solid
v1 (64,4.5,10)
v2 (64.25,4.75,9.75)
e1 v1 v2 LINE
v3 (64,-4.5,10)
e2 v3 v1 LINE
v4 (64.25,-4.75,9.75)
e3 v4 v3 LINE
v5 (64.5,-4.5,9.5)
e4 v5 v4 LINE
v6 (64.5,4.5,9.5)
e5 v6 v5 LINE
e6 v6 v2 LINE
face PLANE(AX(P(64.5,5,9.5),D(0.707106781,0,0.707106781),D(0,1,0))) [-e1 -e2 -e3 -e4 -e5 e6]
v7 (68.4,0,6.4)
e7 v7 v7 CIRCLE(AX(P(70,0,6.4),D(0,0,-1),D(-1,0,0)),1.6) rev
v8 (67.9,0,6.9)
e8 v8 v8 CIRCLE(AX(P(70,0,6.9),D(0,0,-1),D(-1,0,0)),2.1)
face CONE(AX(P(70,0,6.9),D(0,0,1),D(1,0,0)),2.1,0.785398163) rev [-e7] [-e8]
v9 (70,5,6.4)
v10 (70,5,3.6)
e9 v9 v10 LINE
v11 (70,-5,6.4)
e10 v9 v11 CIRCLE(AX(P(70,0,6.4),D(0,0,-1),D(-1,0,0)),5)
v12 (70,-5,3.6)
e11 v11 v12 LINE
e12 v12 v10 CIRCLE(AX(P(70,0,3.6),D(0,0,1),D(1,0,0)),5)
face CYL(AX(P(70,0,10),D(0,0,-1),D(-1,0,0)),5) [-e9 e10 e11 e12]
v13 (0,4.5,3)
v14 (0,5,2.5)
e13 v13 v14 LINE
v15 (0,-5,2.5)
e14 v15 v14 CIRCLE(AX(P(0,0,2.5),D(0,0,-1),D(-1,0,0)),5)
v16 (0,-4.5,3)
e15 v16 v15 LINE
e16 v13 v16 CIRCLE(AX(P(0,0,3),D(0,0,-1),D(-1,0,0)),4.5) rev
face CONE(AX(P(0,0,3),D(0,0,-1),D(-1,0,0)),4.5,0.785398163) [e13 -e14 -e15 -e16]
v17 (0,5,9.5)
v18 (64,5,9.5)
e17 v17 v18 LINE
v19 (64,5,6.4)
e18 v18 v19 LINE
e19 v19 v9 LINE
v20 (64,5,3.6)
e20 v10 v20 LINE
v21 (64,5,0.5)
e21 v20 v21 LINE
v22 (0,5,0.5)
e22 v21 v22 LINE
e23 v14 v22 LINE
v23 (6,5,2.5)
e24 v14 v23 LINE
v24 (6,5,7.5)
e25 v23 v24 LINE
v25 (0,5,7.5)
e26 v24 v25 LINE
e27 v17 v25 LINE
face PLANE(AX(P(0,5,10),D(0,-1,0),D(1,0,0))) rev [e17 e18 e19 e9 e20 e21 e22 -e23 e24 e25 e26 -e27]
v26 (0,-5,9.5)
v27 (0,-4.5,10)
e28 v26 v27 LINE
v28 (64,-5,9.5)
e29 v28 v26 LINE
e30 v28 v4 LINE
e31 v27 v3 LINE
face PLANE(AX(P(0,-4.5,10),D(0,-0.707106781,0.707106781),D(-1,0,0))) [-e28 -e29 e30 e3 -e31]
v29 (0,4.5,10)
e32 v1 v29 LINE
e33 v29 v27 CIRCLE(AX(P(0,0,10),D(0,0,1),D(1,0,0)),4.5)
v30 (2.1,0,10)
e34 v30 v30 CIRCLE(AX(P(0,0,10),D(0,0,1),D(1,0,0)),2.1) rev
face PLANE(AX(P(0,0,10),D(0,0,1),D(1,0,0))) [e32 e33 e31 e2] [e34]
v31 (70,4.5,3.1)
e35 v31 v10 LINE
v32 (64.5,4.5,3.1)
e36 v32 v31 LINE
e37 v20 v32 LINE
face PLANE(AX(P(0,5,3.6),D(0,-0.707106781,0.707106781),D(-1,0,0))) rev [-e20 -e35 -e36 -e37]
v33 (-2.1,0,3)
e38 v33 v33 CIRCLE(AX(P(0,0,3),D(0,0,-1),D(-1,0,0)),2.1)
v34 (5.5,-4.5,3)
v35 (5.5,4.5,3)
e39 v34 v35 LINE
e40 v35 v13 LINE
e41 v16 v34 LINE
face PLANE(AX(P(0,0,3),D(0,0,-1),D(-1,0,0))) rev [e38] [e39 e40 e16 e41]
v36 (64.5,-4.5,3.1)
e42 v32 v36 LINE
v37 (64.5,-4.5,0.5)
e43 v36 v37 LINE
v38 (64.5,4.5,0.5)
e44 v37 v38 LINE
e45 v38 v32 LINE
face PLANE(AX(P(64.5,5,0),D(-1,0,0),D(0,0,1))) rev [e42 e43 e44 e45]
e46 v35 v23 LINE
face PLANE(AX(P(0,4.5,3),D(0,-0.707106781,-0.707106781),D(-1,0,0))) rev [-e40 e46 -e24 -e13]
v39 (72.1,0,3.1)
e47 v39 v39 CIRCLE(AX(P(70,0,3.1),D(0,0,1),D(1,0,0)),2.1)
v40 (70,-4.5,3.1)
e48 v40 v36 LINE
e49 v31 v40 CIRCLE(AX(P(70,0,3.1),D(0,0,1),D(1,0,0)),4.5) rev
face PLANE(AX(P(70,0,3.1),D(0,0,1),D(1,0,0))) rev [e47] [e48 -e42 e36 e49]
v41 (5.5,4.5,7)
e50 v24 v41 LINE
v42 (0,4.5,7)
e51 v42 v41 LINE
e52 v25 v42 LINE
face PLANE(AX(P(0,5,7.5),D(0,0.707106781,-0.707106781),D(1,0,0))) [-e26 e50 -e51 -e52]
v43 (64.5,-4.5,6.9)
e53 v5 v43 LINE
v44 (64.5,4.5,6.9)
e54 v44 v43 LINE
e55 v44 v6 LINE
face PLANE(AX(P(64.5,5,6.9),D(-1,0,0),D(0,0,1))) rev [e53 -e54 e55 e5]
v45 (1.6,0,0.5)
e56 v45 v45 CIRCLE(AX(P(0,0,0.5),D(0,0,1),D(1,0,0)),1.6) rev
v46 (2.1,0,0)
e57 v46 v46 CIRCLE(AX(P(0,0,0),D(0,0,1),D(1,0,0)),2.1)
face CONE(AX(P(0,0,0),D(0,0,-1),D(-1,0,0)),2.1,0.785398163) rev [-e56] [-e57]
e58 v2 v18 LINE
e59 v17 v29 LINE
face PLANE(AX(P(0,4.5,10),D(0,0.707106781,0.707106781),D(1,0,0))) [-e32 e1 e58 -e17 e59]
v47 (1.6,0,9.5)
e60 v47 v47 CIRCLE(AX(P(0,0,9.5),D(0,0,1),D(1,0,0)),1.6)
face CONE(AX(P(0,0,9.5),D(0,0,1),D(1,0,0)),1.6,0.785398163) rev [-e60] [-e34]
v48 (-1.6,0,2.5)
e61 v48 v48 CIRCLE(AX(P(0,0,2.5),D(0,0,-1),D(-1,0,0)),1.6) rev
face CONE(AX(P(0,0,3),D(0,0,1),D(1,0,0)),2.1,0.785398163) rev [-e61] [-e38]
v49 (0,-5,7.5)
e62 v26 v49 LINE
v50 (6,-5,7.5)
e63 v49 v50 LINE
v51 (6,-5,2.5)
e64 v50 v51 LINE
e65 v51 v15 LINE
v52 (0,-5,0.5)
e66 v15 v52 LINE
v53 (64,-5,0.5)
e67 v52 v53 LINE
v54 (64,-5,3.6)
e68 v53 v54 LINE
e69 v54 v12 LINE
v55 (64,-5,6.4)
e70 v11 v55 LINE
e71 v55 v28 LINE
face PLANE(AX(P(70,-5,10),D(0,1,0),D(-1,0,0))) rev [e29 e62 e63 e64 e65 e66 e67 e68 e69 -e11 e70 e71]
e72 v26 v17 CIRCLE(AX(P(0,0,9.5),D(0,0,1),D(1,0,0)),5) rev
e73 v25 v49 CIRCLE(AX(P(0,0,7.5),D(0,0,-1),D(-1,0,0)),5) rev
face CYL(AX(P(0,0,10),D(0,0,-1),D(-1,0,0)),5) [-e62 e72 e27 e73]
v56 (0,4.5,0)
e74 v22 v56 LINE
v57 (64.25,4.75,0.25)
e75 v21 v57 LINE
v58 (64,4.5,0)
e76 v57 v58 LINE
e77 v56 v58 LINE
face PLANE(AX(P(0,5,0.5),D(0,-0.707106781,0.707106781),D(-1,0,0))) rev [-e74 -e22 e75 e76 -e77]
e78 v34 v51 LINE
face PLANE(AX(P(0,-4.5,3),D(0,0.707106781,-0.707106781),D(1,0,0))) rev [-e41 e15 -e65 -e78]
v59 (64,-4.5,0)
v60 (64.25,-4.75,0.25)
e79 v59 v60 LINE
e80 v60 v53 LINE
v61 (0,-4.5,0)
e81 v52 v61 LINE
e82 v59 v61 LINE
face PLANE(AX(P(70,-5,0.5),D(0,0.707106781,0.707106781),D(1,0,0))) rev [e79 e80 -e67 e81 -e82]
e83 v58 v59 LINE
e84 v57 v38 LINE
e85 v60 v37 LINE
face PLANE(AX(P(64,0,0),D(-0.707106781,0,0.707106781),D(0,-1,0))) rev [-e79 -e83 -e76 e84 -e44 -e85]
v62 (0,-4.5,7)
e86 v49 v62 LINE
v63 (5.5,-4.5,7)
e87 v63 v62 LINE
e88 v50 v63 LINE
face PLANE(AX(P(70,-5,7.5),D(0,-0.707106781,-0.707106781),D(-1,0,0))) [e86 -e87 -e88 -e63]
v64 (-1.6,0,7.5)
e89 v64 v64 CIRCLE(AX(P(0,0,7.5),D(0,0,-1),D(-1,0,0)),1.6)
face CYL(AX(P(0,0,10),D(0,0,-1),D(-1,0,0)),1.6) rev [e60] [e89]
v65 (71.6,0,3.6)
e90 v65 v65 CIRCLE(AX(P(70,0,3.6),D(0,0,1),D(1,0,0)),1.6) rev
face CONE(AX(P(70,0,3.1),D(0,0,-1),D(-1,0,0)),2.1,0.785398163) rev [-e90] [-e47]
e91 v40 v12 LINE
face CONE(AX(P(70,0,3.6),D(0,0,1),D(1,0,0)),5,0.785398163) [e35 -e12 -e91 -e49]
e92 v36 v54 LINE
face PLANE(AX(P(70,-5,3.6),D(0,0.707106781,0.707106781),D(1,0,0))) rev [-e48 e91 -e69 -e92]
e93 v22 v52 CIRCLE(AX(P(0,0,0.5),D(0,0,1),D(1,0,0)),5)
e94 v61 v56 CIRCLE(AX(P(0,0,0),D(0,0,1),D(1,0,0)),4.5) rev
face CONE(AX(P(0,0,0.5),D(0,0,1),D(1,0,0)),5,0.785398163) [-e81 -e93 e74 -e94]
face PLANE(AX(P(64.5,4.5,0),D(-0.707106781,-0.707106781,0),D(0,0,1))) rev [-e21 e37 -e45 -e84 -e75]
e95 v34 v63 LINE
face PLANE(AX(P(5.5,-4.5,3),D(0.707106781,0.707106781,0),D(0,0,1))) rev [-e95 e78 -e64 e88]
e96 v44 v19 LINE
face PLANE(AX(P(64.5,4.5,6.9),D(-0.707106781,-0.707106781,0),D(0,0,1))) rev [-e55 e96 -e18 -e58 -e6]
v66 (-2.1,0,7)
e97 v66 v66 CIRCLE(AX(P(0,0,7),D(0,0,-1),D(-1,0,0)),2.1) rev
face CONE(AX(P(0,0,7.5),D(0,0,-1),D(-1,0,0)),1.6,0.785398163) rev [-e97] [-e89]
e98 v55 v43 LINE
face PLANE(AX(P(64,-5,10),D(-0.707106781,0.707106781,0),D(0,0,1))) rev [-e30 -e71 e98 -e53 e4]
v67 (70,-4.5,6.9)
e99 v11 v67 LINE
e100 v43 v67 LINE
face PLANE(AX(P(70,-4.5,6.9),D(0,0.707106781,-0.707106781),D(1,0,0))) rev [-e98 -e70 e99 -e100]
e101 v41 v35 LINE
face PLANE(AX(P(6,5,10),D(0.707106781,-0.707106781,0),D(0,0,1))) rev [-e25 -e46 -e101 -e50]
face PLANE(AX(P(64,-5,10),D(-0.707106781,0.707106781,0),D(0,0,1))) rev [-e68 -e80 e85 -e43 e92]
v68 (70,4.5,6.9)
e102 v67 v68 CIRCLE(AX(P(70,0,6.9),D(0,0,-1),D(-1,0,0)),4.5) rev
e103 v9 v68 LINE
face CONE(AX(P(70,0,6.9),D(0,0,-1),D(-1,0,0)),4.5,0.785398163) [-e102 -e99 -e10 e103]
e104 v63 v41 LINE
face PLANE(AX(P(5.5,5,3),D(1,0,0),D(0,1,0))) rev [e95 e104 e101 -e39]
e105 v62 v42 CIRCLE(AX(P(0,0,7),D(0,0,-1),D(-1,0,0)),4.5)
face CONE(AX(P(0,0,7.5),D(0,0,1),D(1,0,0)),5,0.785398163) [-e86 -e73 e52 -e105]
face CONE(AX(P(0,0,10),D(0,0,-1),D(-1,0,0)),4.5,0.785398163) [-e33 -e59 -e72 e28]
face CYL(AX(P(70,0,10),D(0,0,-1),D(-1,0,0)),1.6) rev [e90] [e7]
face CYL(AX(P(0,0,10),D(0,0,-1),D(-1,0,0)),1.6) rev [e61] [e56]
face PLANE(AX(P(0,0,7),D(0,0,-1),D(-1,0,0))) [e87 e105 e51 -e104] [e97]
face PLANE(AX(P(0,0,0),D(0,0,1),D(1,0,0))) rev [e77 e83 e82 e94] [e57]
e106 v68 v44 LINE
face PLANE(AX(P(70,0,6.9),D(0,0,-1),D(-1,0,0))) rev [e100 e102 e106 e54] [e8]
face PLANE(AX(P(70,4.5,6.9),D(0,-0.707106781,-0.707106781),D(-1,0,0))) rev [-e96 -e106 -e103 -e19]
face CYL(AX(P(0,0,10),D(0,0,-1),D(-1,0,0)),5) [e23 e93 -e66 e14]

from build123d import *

# Parameters (mm, degrees)
SKETCH1_R           = 1.6
BOSS_EXTRUDE1_DEPTH = 10
CUT_EXTRUDE1_START  = -7
CUT_EXTRUDE1_DEPTH  = 4
CHAMFER1_SIZE       = 0.5
CUT_EXTRUDE2_START  = -3.1
CUT_EXTRUDE2_DEPTH  = 3.1
CUT_EXTRUDE3_START  = -6.9
CUT_EXTRUDE3_DEPTH  = 3.1
CHAMFER2_SIZE       = 0.5


with BuildPart() as part:
    # Sketch1 → Boss-Extrude1 (new body)
    with BuildSketch(Plane.XY):
        with BuildLine():
            Line((0, 5), (70, 5))
            ThreePointArc((70, 5), (75, 0), (70, -5))
            Line((70, -5), (0, -5))
            ThreePointArc((0, -5), (-5, 0), (0, 5))
        make_face()
        Circle(SKETCH1_R, mode=Mode.SUBTRACT)
        with Locations((70, 0)):
            Circle(SKETCH1_R, mode=Mode.SUBTRACT)
    extrude(amount=BOSS_EXTRUDE1_DEPTH)

    # Sketch2 → Cut-Extrude1 (cut)
    with BuildSketch(Plane.XY.offset(10).offset(CUT_EXTRUDE1_START)):
        with BuildLine():
            Line((5.5, 5), (5.5, -5))
            Line((5.5, -5), (0, -5))
            ThreePointArc((0, -5), (-5, 0), (0, 5))
            Line((0, 5), (5.5, 5))
        make_face()
    extrude(amount=CUT_EXTRUDE1_DEPTH, mode=Mode.SUBTRACT)

    # Chamfer1
    chamfer1_edges = [part.edges().sort_by_distance(p)[0] for p in [
        (75, 0, 10),
        (-1.6, 0, 0),
        (-1.6, 0, 10),
        (35, 5, 10),
        (68.4, 0, 0),
        (68.4, 0, 10),
        (-1.6, 0, 3),
        (2.75, 5, 3),
        (5.5, 5, 5),
        (2.75, -5, 3),
        (5.5, -5, 5),
        (-5, 0, 3),
        (-1.6, 0, 7),
        (2.75, 5, 7),
        (-5, 0, 7),
        (2.75, -5, 7),
        (-5, 0, 10),
        (35, 5, 0),
        (75, 0, 0),
        (35, -5, 0),
        (-5, 0, 0),
        (35, -5, 10),
    ]]
    chamfer(chamfer1_edges, length=CHAMFER1_SIZE)

    # Sketch3 → Cut-Extrude2 (cut)
    with BuildSketch(Plane.XY.offset(10).offset(CUT_EXTRUDE2_START)):
        with BuildLine():
            Line((64.5, 5), (64.5, -5))
            Line((64.5, -5), (70, -5))
            ThreePointArc((70, -5), (75, 0), (70, 5))
            Line((70, 5), (64.5, 5))
        make_face()
    extrude(amount=CUT_EXTRUDE2_DEPTH, mode=Mode.SUBTRACT)

    # Sketch4 → Cut-Extrude3 (cut)
    with BuildSketch(Plane.XY.offset(6.9).offset(CUT_EXTRUDE3_START)):
        with BuildLine():
            Line((64.5, 5), (64.5, -5))
            Line((64.5, -5), (70, -5))
            ThreePointArc((70, -5), (75, 0), (70, 5))
            Line((70, 5), (64.5, 5))
        make_face()
    extrude(amount=CUT_EXTRUDE3_DEPTH, mode=Mode.SUBTRACT)

    # Chamfer2
    # the kernel refuses this chamfer: 0.5 mm, written as the material it takes off along each edge
    with BuildSketch(Plane(origin=(70, 0, 6.9), x_dir=(1, 0, 0), z_dir=(0, 1, 0))) as chamfer2_piece_1:
        Polygon((1.6 + CHAMFER2_SIZE, 0), (1.6, CHAMFER2_SIZE), (1.6, 0), align=None)
    revolve(axis=Axis((70, 0, 6.9), (0, 0, -1)), mode=Mode.SUBTRACT)
    with BuildSketch(Plane(origin=(70, 0, 3.1), x_dir=(1, 0, 0), z_dir=(0, 1, 0))) as chamfer2_piece_2:
        Polygon((1.6 + CHAMFER2_SIZE, 0), (1.6, -CHAMFER2_SIZE), (1.6, 0), align=None)
    revolve(axis=Axis((70, 0, 3.1), (0, 0, -1)), mode=Mode.SUBTRACT)
    with BuildSketch(Plane(origin=(64.5, -5, -0.785841494), x_dir=(0.0274958766105822, 0.999621916911297, 0), z_dir=(0, 0, 1)), Plane(origin=(64.5, 5, -0.785841494), x_dir=(-0.9996219169112968, 0.02749587661058574, 0), z_dir=(0, 0, 1)), Plane(origin=(64.5, -5, 6.9), x_dir=(0.0274958766105822, 0.999621916911297, 0), z_dir=(0, 0, 1)), Plane(origin=(64.5, 5, 6.9), x_dir=(-0.9996219169112973, 0.027495876610566763, 0), z_dir=(0, 0, 1))) as chamfer2_piece_3:
        Polygon((CHAMFER2_SIZE * 0.999621916911, CHAMFER2_SIZE * 0.0274958766106), (-CHAMFER2_SIZE * 0.0274958766106, CHAMFER2_SIZE * 0.999621916911), (0, 0), align=None)
    extrude(amount=3.885841494, mode=Mode.SUBTRACT)
    with BuildSketch(Plane(origin=(64.5, 5.785841494, 0), x_dir=(0.027495876610582174, 0, 0.9996219169112968), z_dir=(0, -1, 0))) as chamfer2_piece_4:
        Polygon((CHAMFER2_SIZE * 0.999621916911, CHAMFER2_SIZE * 0.0274958766106), (-CHAMFER2_SIZE * 0.0274958766106, CHAMFER2_SIZE * 0.999621916911), (0, 0), align=None)
    extrude(amount=11.571682988, mode=Mode.SUBTRACT)
    with BuildSketch(Plane(origin=(64.5, -5, 3.1), x_dir=(0, 0.9996219169112968, -0.027495876610586462), z_dir=(1, 0, 0)), Plane(origin=(70, 5, 6.9), x_dir=(0, 0.027495876610585647, -0.9996219169112968), z_dir=(-1, 0, 0))) as chamfer2_piece_5:
        Polygon((CHAMFER2_SIZE * 0.999621916911, CHAMFER2_SIZE * 0.0274958766106), (-CHAMFER2_SIZE * 0.0274958766106, CHAMFER2_SIZE * 0.999621916911), (0, 0), align=None)
    extrude(amount=5.5, mode=Mode.SUBTRACT)
    with BuildSketch(Plane(origin=(70, 0, 3.1), x_dir=(0, -1, 0), z_dir=(-1, 0, 0))) as chamfer2_piece_6:
        Polygon((5, CHAMFER2_SIZE), (5 - CHAMFER2_SIZE, 0), (5, 0), align=None)
    revolve(axis=Axis((70, 0, 3.1), (0, 0, 1)), revolution_arc=180, mode=Mode.SUBTRACT)
    with BuildSketch(Plane(origin=(70, 5, 3.1), x_dir=(0, 0.027495876610585623, 0.9996219169112968), z_dir=(-1, 0, 0)), Plane(origin=(64.5, -5, 6.9), x_dir=(0, 0.9996219169112968, 0.0274958766105856), z_dir=(1, 0, 0))) as chamfer2_piece_7:
        Polygon((CHAMFER2_SIZE * 0.999621916911, -CHAMFER2_SIZE * 0.0274958766106), (-CHAMFER2_SIZE * 0.0274958766106, -CHAMFER2_SIZE * 0.999621916911), (0, 0), align=None)
    extrude(amount=5.5, mode=Mode.SUBTRACT)
    with BuildSketch(Plane(origin=(64.5, 5.785841494, 10), x_dir=(0.0274958766105822, 0, -0.999621916911297), z_dir=(0, -1, 0))) as chamfer2_piece_8:
        Polygon((CHAMFER2_SIZE * 0.999621916911, -CHAMFER2_SIZE * 0.0274958766106), (-CHAMFER2_SIZE * 0.0274958766106, -CHAMFER2_SIZE * 0.999621916911), (0, 0), align=None)
    extrude(amount=11.571682988, mode=Mode.SUBTRACT)
    with BuildSketch(Plane(origin=(70, 0, 6.9), x_dir=(0, -1, 0), z_dir=(-1, 0, 0))) as chamfer2_piece_9:
        Polygon((5, -CHAMFER2_SIZE), (5 - CHAMFER2_SIZE, 0), (5, 0), align=None)
    revolve(axis=Axis((70, 0, 6.9), (0, 0, 1)), revolution_arc=180, mode=Mode.SUBTRACT)
    with BuildSketch(Plane(origin=(64.5, -5, -0.785841494), x_dir=(0.0274958766105822, 0.999621916911297, 0), z_dir=(0, 0, 1))) as chamfer2_piece_10a_section:
        Polygon((CHAMFER2_SIZE * 0.999621916911, CHAMFER2_SIZE * 0.0274958766106), (-CHAMFER2_SIZE * 0.0274958766106, CHAMFER2_SIZE * 0.999621916911), (0, 0), align=None)
    chamfer2_piece_10a = extrude(amount=5.171682988, mode=Mode.PRIVATE)
    chamfer2_piece_10a = split(chamfer2_piece_10a, bisect_by=Plane(origin=(64.335103187, -4.835103187, 3.1), z_dir=(0, 0, 1)), keep=Keep.TOP, mode=Mode.PRIVATE)
    with BuildSketch(Plane(origin=(63.214158506, -5, 3.1), x_dir=(0, 0.9996219169112968, -0.02749587661058651), z_dir=(1, 0, 0))) as chamfer2_piece_10b_section:
        Polygon((CHAMFER2_SIZE * 0.999621916911, CHAMFER2_SIZE * 0.0274958766106), (-CHAMFER2_SIZE * 0.0274958766106, CHAMFER2_SIZE * 0.999621916911), (0, 0), align=None)
    chamfer2_piece_10b = extrude(amount=6.785841494, mode=Mode.PRIVATE)
    chamfer2_piece_10b = split(chamfer2_piece_10b, bisect_by=Plane(origin=(64.5, -4.835103187, 3.264896813), z_dir=(-1, 0, 0)), keep=Keep.TOP, mode=Mode.PRIVATE)
    chamfer2_piece_10 = chamfer2_piece_10a & chamfer2_piece_10b
    add(chamfer2_piece_10, mode=Mode.SUBTRACT)
    with BuildSketch(Plane(origin=(64.5, 5, -0.785841494), x_dir=(-0.9996219169112968, 0.02749587661058574, 0), z_dir=(0, 0, 1))) as chamfer2_piece_11a_section:
        Polygon((CHAMFER2_SIZE * 0.999621916911, CHAMFER2_SIZE * 0.0274958766106), (-CHAMFER2_SIZE * 0.0274958766106, CHAMFER2_SIZE * 0.999621916911), (0, 0), align=None)
    chamfer2_piece_11a = extrude(amount=5.171682988, mode=Mode.PRIVATE)
    chamfer2_piece_11a = split(chamfer2_piece_11a, bisect_by=Plane(origin=(64.335103187, 4.835103187, 3.1), z_dir=(0, 0, 1)), keep=Keep.TOP, mode=Mode.PRIVATE)
    with BuildSketch(Plane(origin=(70, 5, 3.1), x_dir=(0, 0.027495876610585623, 0.9996219169112968), z_dir=(-1, 0, 0))) as chamfer2_piece_11b_section:
        Polygon((CHAMFER2_SIZE * 0.999621916911, -CHAMFER2_SIZE * 0.0274958766106), (-CHAMFER2_SIZE * 0.0274958766106, -CHAMFER2_SIZE * 0.999621916911), (0, 0), align=None)
    chamfer2_piece_11b = extrude(amount=6.785841494, mode=Mode.PRIVATE)
    chamfer2_piece_11b = split(chamfer2_piece_11b, bisect_by=Plane(origin=(64.5, 4.835103187, 3.264896813), z_dir=(-1, 0, 0)), keep=Keep.TOP, mode=Mode.PRIVATE)
    chamfer2_piece_11 = chamfer2_piece_11a & chamfer2_piece_11b
    add(chamfer2_piece_11, mode=Mode.SUBTRACT)
    with BuildSketch(Plane(origin=(63.214158506, -5, 6.9), x_dir=(0, 0.9996219169112968, 0.027495876610585647), z_dir=(1, 0, 0))) as chamfer2_piece_12a_section:
        Polygon((CHAMFER2_SIZE * 0.999621916911, -CHAMFER2_SIZE * 0.0274958766106), (-CHAMFER2_SIZE * 0.0274958766106, -CHAMFER2_SIZE * 0.999621916911), (0, 0), align=None)
    chamfer2_piece_12a = extrude(amount=6.785841494, mode=Mode.PRIVATE)
    chamfer2_piece_12a = split(chamfer2_piece_12a, bisect_by=Plane(origin=(64.5, -4.835103187, 6.735103187), z_dir=(-1, 0, 0)), keep=Keep.TOP, mode=Mode.PRIVATE)
    with BuildSketch(Plane(origin=(64.5, -5, 5.614158506), x_dir=(0.0274958766105822, 0.999621916911297, 0), z_dir=(0, 0, 1))) as chamfer2_piece_12b_section:
        Polygon((CHAMFER2_SIZE * 0.999621916911, CHAMFER2_SIZE * 0.0274958766106), (-CHAMFER2_SIZE * 0.0274958766106, CHAMFER2_SIZE * 0.999621916911), (0, 0), align=None)
    chamfer2_piece_12b = extrude(amount=5.171682988, mode=Mode.PRIVATE)
    chamfer2_piece_12b = split(chamfer2_piece_12b, bisect_by=Plane(origin=(64.335103187, -4.835103187, 6.9), z_dir=(0, 0, -1)), keep=Keep.TOP, mode=Mode.PRIVATE)
    chamfer2_piece_12 = chamfer2_piece_12a & chamfer2_piece_12b
    add(chamfer2_piece_12, mode=Mode.SUBTRACT)
    with BuildSketch(Plane(origin=(70, 5, 6.9), x_dir=(0, 0.027495876610585647, -0.9996219169112968), z_dir=(-1, 0, 0))) as chamfer2_piece_13a_section:
        Polygon((CHAMFER2_SIZE * 0.999621916911, CHAMFER2_SIZE * 0.0274958766106), (-CHAMFER2_SIZE * 0.0274958766106, CHAMFER2_SIZE * 0.999621916911), (0, 0), align=None)
    chamfer2_piece_13a = extrude(amount=6.785841494, mode=Mode.PRIVATE)
    chamfer2_piece_13a = split(chamfer2_piece_13a, bisect_by=Plane(origin=(64.5, 4.835103187, 6.735103187), z_dir=(-1, 0, 0)), keep=Keep.TOP, mode=Mode.PRIVATE)
    with BuildSketch(Plane(origin=(64.5, 5, 5.614158506), x_dir=(-0.9996219169112968, 0.02749587661058574, 0), z_dir=(0, 0, 1))) as chamfer2_piece_13b_section:
        Polygon((CHAMFER2_SIZE * 0.999621916911, CHAMFER2_SIZE * 0.0274958766106), (-CHAMFER2_SIZE * 0.0274958766106, CHAMFER2_SIZE * 0.999621916911), (0, 0), align=None)
    chamfer2_piece_13b = extrude(amount=5.171682988, mode=Mode.PRIVATE)
    chamfer2_piece_13b = split(chamfer2_piece_13b, bisect_by=Plane(origin=(64.335103187, 4.835103187, 6.9), z_dir=(0, 0, -1)), keep=Keep.TOP, mode=Mode.PRIVATE)
    chamfer2_piece_13 = chamfer2_piece_13a & chamfer2_piece_13b
    add(chamfer2_piece_13, mode=Mode.SUBTRACT)


solid = part.part
